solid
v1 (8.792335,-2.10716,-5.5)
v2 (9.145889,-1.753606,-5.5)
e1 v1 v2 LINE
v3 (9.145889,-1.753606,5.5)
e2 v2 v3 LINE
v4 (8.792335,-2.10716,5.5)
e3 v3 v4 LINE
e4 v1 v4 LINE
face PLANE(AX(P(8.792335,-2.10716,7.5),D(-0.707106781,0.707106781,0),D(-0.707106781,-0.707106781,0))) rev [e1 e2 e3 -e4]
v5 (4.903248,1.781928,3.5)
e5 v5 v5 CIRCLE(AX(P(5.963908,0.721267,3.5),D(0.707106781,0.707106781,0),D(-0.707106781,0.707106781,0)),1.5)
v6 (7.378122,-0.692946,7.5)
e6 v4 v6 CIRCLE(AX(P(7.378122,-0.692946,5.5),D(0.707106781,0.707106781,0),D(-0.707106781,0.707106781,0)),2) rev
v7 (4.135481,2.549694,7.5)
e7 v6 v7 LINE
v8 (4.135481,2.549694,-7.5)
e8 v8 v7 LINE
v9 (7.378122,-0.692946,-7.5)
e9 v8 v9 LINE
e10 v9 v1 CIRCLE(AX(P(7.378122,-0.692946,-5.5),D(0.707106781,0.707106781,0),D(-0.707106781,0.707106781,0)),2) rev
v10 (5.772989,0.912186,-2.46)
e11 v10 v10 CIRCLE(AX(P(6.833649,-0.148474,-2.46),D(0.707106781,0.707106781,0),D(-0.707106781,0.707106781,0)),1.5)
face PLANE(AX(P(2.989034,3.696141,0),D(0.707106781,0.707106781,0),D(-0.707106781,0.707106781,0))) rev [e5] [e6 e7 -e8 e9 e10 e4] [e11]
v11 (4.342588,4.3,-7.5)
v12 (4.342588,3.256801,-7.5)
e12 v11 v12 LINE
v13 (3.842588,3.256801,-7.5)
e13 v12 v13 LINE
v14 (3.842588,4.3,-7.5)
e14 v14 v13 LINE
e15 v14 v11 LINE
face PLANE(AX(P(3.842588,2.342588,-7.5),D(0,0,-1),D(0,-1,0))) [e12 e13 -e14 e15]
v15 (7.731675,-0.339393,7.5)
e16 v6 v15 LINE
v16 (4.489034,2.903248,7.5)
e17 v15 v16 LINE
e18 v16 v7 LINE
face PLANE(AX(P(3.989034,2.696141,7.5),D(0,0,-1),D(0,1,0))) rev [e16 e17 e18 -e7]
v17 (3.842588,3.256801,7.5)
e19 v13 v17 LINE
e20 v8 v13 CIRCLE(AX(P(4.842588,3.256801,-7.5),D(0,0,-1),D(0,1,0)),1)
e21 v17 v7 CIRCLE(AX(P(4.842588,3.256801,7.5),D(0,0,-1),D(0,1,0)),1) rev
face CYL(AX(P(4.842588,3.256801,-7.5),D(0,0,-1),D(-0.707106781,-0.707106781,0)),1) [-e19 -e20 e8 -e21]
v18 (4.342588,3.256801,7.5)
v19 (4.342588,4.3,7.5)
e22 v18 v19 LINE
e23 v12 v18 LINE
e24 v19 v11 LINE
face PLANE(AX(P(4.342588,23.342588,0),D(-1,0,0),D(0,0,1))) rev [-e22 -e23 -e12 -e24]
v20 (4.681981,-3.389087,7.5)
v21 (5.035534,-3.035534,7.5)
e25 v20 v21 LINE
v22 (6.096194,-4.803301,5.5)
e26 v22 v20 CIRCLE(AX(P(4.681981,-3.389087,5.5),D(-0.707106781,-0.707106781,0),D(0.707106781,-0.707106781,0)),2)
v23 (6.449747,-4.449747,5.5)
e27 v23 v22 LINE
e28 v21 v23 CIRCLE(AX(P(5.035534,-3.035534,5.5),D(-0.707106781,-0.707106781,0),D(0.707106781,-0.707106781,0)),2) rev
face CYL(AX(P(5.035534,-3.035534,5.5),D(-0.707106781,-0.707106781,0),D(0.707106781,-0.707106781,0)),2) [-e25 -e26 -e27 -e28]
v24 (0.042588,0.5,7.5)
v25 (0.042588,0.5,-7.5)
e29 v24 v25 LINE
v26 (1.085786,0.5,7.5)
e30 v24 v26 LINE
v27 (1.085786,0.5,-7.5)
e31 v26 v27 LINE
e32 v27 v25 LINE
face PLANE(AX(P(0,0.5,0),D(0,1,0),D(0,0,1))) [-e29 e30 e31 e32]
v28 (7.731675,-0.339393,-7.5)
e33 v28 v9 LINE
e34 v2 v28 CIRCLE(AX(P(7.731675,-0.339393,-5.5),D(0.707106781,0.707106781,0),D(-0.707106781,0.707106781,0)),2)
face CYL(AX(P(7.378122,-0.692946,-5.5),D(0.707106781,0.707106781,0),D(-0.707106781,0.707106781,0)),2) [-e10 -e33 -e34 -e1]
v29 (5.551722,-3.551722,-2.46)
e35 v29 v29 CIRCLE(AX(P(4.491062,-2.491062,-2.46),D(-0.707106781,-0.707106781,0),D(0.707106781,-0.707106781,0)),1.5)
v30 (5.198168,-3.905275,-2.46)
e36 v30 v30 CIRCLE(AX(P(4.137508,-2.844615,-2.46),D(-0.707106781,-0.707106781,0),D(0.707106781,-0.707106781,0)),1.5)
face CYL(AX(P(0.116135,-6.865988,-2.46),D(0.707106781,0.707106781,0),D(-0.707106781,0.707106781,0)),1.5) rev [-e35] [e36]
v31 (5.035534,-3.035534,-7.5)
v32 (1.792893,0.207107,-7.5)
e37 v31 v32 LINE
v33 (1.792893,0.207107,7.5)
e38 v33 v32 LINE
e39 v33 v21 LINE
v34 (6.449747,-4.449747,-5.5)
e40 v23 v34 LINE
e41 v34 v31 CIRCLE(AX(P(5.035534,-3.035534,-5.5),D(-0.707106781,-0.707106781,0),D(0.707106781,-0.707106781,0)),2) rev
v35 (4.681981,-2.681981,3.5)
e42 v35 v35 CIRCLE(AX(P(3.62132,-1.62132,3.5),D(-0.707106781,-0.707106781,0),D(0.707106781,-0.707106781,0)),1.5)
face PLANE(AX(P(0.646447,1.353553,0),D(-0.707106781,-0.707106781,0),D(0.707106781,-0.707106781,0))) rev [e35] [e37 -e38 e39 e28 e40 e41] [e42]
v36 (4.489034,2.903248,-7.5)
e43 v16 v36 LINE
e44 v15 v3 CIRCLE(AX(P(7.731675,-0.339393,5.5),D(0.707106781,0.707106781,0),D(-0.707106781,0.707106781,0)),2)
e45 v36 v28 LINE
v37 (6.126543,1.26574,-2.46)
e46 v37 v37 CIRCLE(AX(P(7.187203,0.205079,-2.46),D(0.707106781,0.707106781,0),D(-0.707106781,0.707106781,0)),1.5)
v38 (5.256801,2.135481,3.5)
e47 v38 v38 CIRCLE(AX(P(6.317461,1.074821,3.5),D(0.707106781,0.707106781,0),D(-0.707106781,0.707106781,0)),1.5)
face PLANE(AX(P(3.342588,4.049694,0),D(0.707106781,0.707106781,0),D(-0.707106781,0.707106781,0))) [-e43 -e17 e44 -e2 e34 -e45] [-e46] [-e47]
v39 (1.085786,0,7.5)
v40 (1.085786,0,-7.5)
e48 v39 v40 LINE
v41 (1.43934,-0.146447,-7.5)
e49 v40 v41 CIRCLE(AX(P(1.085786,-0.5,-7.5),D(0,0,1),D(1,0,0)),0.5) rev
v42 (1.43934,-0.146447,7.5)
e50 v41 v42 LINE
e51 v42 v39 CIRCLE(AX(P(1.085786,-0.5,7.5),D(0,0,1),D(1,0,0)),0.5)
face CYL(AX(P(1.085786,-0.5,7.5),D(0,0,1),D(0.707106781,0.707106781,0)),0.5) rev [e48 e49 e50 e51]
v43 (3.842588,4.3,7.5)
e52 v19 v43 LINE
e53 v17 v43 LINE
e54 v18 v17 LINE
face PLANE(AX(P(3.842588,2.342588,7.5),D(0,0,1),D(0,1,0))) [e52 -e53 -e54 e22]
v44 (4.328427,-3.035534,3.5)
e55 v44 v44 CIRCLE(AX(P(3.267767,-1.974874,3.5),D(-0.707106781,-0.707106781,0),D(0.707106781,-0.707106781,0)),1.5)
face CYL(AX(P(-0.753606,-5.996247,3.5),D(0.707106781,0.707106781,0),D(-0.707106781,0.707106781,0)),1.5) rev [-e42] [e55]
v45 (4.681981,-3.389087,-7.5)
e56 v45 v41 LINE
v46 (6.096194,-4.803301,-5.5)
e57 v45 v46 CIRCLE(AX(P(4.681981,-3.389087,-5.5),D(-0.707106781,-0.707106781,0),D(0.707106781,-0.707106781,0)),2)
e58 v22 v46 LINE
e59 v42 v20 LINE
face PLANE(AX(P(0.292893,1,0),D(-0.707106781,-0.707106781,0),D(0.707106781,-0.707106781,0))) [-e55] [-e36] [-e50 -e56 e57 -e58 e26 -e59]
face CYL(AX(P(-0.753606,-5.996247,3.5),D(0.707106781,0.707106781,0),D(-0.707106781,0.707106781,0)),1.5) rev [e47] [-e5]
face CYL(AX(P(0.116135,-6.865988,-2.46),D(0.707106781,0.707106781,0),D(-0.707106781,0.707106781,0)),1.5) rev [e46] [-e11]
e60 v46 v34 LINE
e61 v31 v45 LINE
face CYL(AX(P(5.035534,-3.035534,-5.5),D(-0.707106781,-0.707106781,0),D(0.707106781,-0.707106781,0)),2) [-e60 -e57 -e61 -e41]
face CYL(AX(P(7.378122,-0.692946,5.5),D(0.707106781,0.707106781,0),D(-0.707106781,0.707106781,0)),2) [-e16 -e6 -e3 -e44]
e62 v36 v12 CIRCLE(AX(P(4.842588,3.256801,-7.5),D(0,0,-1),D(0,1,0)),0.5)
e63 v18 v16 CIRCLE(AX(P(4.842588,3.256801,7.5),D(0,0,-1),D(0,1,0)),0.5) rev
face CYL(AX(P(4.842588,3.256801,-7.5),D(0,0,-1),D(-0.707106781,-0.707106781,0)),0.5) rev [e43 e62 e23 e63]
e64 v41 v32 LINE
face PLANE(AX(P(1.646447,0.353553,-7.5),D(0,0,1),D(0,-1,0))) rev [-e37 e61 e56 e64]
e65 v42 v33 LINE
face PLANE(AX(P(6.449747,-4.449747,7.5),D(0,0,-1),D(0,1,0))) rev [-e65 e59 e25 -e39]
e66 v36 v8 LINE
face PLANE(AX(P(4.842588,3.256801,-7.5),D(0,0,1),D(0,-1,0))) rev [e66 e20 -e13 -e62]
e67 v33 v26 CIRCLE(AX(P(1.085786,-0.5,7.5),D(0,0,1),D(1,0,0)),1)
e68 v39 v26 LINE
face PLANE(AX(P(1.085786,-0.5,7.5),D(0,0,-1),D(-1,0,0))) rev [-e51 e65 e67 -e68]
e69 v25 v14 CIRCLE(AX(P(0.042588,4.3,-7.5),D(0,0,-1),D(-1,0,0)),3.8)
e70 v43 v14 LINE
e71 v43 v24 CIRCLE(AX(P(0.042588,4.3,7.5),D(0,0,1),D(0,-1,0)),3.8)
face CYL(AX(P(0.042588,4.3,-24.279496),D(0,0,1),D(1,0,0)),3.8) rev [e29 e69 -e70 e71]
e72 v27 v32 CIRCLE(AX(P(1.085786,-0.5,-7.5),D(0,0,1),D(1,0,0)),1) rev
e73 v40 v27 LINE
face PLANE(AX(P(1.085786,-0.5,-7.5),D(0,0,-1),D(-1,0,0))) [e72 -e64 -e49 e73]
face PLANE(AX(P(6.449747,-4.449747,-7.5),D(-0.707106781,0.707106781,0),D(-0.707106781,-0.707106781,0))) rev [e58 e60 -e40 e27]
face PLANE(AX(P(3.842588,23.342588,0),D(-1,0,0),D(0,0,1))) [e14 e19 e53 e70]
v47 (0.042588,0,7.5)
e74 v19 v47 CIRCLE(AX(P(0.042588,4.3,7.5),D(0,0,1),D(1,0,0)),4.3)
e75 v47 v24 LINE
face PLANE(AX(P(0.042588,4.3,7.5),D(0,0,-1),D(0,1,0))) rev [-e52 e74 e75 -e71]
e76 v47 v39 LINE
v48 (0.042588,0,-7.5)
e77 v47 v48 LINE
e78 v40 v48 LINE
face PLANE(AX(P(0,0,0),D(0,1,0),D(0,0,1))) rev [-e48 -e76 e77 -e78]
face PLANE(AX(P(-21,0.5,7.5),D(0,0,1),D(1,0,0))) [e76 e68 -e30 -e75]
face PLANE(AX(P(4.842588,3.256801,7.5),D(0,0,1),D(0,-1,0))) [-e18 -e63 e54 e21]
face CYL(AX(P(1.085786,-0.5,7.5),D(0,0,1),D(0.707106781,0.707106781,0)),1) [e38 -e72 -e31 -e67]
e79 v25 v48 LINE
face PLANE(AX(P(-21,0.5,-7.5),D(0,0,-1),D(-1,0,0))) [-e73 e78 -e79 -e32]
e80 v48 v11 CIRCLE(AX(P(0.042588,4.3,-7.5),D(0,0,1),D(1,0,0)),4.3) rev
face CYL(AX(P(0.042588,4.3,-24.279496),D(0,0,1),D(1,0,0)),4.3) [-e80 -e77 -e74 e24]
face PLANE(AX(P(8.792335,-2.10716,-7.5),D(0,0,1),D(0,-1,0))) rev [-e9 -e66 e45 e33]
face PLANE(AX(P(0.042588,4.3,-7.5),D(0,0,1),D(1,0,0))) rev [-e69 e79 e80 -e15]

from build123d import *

# Parameters (mm, degrees)
SKETCH_1_W               = 23
SKETCH_1_H               = 15
EXTRUDE_1_DEPTH          = 0.5
OTHER_START              = -7.5
OTHER_1_DEPTH            = 15
OTHER_1_2_DEPTH          = 15
SM_START                 = -7.5
SM_EDGE_FLANGE_1_DEPTH   = 15
SM_EDGE_FLANGE_1_2_DEPTH = 15
FILLET_1_R               = 2
SKETCH_16_R              = 1.5
CUT_EXTRUDE_1_DEPTH      = 10


# Read off the part's stored shape, not the designer's step: Нарисованный сгиб1, Ребро-кромка1
with BuildPart() as part:
    # Sketch 1 → Бобышка-Вытянуть1 (new body)
    with BuildSketch(Plane(origin=(0, 0, 0), x_dir=(1, 0, 0), z_dir=(0, 1, 0))):
        with Locations((-9.5, 0)):
            Rectangle(SKETCH_1_W, SKETCH_1_H)
    extrude(amount=EXTRUDE_1_DEPTH)

    # Other 1 outline → Other 1 (cut)
    with BuildSketch(Plane.XY.offset(OTHER_START)):
        with BuildLine():
            ThreePointArc((0.042587685, 0), (-0.994234383, 0.126871677), (-1.969873495, 0.5))
            Line((-1.969873495, 0.5), (-21, 0.5))
            Line((-21, 0.5), (-21, 0))
            Line((-21, 0), (0.042587685, 0))
        make_face()
    extrude(amount=OTHER_1_DEPTH, mode=Mode.SUBTRACT)

    # Other 1 2 outline → Other 1 2 (add)
    with BuildSketch(Plane.XY.offset(OTHER_START)):
        with BuildLine():
            ThreePointArc((0.042587685, 0.5), (-2.644418083, 6.987005769), (3.842587685, 4.3))
            Line((3.842587685, 4.3), (3.842587685, 2.342587685))
            Line((3.842587685, 2.342587685), (4.342587685, 2.342587685))
            Line((4.342587685, 2.342587685), (4.342587685, 4.3))
            ThreePointArc((4.342587685, 4.3), (-2.175115736, 7.983991251), (-1.969873495, 0.5))
            Line((-1.969873495, 0.5), (0.042587685, 0.5))
        make_face()
    extrude(amount=OTHER_1_2_DEPTH)

    # Ребро-кромка1 outline → Ребро-кромка1 (cut)
    with BuildSketch(Plane.XY.offset(SM_START)):
        with BuildLine():
            ThreePointArc((1.085786438, 0.5), (1.46846987, 0.423879533), (1.792893219, 0.207106781))
            Line((1.792893219, 0.207106781), (2, 0))
            Line((2, 0), (2, 0.5))
            Line((2, 0.5), (1.085786438, 0.5))
        make_face()
        with BuildLine():
            Line((3.842587685, 2.342587685), (4.342587685, 2.342587685))
            Line((4.342587685, 2.342587685), (4.135480904, 2.549694466))
            ThreePointArc((4.135480904, 2.549694466), (3.918708153, 2.874117815), (3.842587685, 3.256801248))
            Line((3.842587685, 3.256801248), (3.842587685, 2.342587685))
        make_face()
    extrude(amount=SM_EDGE_FLANGE_1_DEPTH, mode=Mode.SUBTRACT)

    # Sm Edge Flange 1 2 outline → Sm Edge Flange 1 2 (add)
    with BuildSketch(Plane.XY.offset(SM_START)):
        with BuildLine():
            Line((6.449747468, -4.449747468), (2, 0))
            Line((2, 0), (1.085786438, 0))
            ThreePointArc((1.085786438, 0), (1.277128154, -0.038060234), (1.439339828, -0.146446609))
            Line((1.439339828, -0.146446609), (6.096194078, -4.803300859))
            Line((6.096194078, -4.803300859), (6.449747468, -4.449747468))
        make_face()
        with BuildLine():
            Line((8.792335154, -2.107159783), (9.145888544, -1.753606392))
            Line((9.145888544, -1.753606392), (4.489034295, 2.903247857))
            ThreePointArc((4.489034295, 2.903247857), (4.380647919, 3.065459531), (4.342587685, 3.256801248))
            Line((4.342587685, 3.256801248), (4.342587685, 2.342587685))
            Line((4.342587685, 2.342587685), (8.792335154, -2.107159783))
        make_face()
    extrude(amount=SM_EDGE_FLANGE_1_2_DEPTH)

    # Скругление1
    fillet_1_edges = [part.edges().sort_by_distance(p)[0] for p in [
        (8.969111849, -1.930383088, 7.5),
        (8.969111849, -1.930383088, -7.5),
        (6.272970773, -4.626524164, -7.5),
        (6.272970773, -4.626524164, 7.5),
    ]]
    fillet(fillet_1_edges, radius=FILLET_1_R)

    # Эскиз16 → Вырез-Вытянуть1 (cut)
    with BuildSketch(Plane(origin=(3.696141076, 3.696141076, 0), x_dir=(0, 0, -1), z_dir=(0.7071067811865587, 0.7071067811865365, 0))):
        with Locations(Location((2.46, -4.937106781, 0), (0, 0, 90))):
            Circle(SKETCH_16_R)
        with Locations(Location((-3.5, -3.707106781, 0), (0, 0, 90))):
            Circle(SKETCH_16_R)
    extrude(amount=-CUT_EXTRUDE_1_DEPTH, mode=Mode.SUBTRACT)


solid = part.part
